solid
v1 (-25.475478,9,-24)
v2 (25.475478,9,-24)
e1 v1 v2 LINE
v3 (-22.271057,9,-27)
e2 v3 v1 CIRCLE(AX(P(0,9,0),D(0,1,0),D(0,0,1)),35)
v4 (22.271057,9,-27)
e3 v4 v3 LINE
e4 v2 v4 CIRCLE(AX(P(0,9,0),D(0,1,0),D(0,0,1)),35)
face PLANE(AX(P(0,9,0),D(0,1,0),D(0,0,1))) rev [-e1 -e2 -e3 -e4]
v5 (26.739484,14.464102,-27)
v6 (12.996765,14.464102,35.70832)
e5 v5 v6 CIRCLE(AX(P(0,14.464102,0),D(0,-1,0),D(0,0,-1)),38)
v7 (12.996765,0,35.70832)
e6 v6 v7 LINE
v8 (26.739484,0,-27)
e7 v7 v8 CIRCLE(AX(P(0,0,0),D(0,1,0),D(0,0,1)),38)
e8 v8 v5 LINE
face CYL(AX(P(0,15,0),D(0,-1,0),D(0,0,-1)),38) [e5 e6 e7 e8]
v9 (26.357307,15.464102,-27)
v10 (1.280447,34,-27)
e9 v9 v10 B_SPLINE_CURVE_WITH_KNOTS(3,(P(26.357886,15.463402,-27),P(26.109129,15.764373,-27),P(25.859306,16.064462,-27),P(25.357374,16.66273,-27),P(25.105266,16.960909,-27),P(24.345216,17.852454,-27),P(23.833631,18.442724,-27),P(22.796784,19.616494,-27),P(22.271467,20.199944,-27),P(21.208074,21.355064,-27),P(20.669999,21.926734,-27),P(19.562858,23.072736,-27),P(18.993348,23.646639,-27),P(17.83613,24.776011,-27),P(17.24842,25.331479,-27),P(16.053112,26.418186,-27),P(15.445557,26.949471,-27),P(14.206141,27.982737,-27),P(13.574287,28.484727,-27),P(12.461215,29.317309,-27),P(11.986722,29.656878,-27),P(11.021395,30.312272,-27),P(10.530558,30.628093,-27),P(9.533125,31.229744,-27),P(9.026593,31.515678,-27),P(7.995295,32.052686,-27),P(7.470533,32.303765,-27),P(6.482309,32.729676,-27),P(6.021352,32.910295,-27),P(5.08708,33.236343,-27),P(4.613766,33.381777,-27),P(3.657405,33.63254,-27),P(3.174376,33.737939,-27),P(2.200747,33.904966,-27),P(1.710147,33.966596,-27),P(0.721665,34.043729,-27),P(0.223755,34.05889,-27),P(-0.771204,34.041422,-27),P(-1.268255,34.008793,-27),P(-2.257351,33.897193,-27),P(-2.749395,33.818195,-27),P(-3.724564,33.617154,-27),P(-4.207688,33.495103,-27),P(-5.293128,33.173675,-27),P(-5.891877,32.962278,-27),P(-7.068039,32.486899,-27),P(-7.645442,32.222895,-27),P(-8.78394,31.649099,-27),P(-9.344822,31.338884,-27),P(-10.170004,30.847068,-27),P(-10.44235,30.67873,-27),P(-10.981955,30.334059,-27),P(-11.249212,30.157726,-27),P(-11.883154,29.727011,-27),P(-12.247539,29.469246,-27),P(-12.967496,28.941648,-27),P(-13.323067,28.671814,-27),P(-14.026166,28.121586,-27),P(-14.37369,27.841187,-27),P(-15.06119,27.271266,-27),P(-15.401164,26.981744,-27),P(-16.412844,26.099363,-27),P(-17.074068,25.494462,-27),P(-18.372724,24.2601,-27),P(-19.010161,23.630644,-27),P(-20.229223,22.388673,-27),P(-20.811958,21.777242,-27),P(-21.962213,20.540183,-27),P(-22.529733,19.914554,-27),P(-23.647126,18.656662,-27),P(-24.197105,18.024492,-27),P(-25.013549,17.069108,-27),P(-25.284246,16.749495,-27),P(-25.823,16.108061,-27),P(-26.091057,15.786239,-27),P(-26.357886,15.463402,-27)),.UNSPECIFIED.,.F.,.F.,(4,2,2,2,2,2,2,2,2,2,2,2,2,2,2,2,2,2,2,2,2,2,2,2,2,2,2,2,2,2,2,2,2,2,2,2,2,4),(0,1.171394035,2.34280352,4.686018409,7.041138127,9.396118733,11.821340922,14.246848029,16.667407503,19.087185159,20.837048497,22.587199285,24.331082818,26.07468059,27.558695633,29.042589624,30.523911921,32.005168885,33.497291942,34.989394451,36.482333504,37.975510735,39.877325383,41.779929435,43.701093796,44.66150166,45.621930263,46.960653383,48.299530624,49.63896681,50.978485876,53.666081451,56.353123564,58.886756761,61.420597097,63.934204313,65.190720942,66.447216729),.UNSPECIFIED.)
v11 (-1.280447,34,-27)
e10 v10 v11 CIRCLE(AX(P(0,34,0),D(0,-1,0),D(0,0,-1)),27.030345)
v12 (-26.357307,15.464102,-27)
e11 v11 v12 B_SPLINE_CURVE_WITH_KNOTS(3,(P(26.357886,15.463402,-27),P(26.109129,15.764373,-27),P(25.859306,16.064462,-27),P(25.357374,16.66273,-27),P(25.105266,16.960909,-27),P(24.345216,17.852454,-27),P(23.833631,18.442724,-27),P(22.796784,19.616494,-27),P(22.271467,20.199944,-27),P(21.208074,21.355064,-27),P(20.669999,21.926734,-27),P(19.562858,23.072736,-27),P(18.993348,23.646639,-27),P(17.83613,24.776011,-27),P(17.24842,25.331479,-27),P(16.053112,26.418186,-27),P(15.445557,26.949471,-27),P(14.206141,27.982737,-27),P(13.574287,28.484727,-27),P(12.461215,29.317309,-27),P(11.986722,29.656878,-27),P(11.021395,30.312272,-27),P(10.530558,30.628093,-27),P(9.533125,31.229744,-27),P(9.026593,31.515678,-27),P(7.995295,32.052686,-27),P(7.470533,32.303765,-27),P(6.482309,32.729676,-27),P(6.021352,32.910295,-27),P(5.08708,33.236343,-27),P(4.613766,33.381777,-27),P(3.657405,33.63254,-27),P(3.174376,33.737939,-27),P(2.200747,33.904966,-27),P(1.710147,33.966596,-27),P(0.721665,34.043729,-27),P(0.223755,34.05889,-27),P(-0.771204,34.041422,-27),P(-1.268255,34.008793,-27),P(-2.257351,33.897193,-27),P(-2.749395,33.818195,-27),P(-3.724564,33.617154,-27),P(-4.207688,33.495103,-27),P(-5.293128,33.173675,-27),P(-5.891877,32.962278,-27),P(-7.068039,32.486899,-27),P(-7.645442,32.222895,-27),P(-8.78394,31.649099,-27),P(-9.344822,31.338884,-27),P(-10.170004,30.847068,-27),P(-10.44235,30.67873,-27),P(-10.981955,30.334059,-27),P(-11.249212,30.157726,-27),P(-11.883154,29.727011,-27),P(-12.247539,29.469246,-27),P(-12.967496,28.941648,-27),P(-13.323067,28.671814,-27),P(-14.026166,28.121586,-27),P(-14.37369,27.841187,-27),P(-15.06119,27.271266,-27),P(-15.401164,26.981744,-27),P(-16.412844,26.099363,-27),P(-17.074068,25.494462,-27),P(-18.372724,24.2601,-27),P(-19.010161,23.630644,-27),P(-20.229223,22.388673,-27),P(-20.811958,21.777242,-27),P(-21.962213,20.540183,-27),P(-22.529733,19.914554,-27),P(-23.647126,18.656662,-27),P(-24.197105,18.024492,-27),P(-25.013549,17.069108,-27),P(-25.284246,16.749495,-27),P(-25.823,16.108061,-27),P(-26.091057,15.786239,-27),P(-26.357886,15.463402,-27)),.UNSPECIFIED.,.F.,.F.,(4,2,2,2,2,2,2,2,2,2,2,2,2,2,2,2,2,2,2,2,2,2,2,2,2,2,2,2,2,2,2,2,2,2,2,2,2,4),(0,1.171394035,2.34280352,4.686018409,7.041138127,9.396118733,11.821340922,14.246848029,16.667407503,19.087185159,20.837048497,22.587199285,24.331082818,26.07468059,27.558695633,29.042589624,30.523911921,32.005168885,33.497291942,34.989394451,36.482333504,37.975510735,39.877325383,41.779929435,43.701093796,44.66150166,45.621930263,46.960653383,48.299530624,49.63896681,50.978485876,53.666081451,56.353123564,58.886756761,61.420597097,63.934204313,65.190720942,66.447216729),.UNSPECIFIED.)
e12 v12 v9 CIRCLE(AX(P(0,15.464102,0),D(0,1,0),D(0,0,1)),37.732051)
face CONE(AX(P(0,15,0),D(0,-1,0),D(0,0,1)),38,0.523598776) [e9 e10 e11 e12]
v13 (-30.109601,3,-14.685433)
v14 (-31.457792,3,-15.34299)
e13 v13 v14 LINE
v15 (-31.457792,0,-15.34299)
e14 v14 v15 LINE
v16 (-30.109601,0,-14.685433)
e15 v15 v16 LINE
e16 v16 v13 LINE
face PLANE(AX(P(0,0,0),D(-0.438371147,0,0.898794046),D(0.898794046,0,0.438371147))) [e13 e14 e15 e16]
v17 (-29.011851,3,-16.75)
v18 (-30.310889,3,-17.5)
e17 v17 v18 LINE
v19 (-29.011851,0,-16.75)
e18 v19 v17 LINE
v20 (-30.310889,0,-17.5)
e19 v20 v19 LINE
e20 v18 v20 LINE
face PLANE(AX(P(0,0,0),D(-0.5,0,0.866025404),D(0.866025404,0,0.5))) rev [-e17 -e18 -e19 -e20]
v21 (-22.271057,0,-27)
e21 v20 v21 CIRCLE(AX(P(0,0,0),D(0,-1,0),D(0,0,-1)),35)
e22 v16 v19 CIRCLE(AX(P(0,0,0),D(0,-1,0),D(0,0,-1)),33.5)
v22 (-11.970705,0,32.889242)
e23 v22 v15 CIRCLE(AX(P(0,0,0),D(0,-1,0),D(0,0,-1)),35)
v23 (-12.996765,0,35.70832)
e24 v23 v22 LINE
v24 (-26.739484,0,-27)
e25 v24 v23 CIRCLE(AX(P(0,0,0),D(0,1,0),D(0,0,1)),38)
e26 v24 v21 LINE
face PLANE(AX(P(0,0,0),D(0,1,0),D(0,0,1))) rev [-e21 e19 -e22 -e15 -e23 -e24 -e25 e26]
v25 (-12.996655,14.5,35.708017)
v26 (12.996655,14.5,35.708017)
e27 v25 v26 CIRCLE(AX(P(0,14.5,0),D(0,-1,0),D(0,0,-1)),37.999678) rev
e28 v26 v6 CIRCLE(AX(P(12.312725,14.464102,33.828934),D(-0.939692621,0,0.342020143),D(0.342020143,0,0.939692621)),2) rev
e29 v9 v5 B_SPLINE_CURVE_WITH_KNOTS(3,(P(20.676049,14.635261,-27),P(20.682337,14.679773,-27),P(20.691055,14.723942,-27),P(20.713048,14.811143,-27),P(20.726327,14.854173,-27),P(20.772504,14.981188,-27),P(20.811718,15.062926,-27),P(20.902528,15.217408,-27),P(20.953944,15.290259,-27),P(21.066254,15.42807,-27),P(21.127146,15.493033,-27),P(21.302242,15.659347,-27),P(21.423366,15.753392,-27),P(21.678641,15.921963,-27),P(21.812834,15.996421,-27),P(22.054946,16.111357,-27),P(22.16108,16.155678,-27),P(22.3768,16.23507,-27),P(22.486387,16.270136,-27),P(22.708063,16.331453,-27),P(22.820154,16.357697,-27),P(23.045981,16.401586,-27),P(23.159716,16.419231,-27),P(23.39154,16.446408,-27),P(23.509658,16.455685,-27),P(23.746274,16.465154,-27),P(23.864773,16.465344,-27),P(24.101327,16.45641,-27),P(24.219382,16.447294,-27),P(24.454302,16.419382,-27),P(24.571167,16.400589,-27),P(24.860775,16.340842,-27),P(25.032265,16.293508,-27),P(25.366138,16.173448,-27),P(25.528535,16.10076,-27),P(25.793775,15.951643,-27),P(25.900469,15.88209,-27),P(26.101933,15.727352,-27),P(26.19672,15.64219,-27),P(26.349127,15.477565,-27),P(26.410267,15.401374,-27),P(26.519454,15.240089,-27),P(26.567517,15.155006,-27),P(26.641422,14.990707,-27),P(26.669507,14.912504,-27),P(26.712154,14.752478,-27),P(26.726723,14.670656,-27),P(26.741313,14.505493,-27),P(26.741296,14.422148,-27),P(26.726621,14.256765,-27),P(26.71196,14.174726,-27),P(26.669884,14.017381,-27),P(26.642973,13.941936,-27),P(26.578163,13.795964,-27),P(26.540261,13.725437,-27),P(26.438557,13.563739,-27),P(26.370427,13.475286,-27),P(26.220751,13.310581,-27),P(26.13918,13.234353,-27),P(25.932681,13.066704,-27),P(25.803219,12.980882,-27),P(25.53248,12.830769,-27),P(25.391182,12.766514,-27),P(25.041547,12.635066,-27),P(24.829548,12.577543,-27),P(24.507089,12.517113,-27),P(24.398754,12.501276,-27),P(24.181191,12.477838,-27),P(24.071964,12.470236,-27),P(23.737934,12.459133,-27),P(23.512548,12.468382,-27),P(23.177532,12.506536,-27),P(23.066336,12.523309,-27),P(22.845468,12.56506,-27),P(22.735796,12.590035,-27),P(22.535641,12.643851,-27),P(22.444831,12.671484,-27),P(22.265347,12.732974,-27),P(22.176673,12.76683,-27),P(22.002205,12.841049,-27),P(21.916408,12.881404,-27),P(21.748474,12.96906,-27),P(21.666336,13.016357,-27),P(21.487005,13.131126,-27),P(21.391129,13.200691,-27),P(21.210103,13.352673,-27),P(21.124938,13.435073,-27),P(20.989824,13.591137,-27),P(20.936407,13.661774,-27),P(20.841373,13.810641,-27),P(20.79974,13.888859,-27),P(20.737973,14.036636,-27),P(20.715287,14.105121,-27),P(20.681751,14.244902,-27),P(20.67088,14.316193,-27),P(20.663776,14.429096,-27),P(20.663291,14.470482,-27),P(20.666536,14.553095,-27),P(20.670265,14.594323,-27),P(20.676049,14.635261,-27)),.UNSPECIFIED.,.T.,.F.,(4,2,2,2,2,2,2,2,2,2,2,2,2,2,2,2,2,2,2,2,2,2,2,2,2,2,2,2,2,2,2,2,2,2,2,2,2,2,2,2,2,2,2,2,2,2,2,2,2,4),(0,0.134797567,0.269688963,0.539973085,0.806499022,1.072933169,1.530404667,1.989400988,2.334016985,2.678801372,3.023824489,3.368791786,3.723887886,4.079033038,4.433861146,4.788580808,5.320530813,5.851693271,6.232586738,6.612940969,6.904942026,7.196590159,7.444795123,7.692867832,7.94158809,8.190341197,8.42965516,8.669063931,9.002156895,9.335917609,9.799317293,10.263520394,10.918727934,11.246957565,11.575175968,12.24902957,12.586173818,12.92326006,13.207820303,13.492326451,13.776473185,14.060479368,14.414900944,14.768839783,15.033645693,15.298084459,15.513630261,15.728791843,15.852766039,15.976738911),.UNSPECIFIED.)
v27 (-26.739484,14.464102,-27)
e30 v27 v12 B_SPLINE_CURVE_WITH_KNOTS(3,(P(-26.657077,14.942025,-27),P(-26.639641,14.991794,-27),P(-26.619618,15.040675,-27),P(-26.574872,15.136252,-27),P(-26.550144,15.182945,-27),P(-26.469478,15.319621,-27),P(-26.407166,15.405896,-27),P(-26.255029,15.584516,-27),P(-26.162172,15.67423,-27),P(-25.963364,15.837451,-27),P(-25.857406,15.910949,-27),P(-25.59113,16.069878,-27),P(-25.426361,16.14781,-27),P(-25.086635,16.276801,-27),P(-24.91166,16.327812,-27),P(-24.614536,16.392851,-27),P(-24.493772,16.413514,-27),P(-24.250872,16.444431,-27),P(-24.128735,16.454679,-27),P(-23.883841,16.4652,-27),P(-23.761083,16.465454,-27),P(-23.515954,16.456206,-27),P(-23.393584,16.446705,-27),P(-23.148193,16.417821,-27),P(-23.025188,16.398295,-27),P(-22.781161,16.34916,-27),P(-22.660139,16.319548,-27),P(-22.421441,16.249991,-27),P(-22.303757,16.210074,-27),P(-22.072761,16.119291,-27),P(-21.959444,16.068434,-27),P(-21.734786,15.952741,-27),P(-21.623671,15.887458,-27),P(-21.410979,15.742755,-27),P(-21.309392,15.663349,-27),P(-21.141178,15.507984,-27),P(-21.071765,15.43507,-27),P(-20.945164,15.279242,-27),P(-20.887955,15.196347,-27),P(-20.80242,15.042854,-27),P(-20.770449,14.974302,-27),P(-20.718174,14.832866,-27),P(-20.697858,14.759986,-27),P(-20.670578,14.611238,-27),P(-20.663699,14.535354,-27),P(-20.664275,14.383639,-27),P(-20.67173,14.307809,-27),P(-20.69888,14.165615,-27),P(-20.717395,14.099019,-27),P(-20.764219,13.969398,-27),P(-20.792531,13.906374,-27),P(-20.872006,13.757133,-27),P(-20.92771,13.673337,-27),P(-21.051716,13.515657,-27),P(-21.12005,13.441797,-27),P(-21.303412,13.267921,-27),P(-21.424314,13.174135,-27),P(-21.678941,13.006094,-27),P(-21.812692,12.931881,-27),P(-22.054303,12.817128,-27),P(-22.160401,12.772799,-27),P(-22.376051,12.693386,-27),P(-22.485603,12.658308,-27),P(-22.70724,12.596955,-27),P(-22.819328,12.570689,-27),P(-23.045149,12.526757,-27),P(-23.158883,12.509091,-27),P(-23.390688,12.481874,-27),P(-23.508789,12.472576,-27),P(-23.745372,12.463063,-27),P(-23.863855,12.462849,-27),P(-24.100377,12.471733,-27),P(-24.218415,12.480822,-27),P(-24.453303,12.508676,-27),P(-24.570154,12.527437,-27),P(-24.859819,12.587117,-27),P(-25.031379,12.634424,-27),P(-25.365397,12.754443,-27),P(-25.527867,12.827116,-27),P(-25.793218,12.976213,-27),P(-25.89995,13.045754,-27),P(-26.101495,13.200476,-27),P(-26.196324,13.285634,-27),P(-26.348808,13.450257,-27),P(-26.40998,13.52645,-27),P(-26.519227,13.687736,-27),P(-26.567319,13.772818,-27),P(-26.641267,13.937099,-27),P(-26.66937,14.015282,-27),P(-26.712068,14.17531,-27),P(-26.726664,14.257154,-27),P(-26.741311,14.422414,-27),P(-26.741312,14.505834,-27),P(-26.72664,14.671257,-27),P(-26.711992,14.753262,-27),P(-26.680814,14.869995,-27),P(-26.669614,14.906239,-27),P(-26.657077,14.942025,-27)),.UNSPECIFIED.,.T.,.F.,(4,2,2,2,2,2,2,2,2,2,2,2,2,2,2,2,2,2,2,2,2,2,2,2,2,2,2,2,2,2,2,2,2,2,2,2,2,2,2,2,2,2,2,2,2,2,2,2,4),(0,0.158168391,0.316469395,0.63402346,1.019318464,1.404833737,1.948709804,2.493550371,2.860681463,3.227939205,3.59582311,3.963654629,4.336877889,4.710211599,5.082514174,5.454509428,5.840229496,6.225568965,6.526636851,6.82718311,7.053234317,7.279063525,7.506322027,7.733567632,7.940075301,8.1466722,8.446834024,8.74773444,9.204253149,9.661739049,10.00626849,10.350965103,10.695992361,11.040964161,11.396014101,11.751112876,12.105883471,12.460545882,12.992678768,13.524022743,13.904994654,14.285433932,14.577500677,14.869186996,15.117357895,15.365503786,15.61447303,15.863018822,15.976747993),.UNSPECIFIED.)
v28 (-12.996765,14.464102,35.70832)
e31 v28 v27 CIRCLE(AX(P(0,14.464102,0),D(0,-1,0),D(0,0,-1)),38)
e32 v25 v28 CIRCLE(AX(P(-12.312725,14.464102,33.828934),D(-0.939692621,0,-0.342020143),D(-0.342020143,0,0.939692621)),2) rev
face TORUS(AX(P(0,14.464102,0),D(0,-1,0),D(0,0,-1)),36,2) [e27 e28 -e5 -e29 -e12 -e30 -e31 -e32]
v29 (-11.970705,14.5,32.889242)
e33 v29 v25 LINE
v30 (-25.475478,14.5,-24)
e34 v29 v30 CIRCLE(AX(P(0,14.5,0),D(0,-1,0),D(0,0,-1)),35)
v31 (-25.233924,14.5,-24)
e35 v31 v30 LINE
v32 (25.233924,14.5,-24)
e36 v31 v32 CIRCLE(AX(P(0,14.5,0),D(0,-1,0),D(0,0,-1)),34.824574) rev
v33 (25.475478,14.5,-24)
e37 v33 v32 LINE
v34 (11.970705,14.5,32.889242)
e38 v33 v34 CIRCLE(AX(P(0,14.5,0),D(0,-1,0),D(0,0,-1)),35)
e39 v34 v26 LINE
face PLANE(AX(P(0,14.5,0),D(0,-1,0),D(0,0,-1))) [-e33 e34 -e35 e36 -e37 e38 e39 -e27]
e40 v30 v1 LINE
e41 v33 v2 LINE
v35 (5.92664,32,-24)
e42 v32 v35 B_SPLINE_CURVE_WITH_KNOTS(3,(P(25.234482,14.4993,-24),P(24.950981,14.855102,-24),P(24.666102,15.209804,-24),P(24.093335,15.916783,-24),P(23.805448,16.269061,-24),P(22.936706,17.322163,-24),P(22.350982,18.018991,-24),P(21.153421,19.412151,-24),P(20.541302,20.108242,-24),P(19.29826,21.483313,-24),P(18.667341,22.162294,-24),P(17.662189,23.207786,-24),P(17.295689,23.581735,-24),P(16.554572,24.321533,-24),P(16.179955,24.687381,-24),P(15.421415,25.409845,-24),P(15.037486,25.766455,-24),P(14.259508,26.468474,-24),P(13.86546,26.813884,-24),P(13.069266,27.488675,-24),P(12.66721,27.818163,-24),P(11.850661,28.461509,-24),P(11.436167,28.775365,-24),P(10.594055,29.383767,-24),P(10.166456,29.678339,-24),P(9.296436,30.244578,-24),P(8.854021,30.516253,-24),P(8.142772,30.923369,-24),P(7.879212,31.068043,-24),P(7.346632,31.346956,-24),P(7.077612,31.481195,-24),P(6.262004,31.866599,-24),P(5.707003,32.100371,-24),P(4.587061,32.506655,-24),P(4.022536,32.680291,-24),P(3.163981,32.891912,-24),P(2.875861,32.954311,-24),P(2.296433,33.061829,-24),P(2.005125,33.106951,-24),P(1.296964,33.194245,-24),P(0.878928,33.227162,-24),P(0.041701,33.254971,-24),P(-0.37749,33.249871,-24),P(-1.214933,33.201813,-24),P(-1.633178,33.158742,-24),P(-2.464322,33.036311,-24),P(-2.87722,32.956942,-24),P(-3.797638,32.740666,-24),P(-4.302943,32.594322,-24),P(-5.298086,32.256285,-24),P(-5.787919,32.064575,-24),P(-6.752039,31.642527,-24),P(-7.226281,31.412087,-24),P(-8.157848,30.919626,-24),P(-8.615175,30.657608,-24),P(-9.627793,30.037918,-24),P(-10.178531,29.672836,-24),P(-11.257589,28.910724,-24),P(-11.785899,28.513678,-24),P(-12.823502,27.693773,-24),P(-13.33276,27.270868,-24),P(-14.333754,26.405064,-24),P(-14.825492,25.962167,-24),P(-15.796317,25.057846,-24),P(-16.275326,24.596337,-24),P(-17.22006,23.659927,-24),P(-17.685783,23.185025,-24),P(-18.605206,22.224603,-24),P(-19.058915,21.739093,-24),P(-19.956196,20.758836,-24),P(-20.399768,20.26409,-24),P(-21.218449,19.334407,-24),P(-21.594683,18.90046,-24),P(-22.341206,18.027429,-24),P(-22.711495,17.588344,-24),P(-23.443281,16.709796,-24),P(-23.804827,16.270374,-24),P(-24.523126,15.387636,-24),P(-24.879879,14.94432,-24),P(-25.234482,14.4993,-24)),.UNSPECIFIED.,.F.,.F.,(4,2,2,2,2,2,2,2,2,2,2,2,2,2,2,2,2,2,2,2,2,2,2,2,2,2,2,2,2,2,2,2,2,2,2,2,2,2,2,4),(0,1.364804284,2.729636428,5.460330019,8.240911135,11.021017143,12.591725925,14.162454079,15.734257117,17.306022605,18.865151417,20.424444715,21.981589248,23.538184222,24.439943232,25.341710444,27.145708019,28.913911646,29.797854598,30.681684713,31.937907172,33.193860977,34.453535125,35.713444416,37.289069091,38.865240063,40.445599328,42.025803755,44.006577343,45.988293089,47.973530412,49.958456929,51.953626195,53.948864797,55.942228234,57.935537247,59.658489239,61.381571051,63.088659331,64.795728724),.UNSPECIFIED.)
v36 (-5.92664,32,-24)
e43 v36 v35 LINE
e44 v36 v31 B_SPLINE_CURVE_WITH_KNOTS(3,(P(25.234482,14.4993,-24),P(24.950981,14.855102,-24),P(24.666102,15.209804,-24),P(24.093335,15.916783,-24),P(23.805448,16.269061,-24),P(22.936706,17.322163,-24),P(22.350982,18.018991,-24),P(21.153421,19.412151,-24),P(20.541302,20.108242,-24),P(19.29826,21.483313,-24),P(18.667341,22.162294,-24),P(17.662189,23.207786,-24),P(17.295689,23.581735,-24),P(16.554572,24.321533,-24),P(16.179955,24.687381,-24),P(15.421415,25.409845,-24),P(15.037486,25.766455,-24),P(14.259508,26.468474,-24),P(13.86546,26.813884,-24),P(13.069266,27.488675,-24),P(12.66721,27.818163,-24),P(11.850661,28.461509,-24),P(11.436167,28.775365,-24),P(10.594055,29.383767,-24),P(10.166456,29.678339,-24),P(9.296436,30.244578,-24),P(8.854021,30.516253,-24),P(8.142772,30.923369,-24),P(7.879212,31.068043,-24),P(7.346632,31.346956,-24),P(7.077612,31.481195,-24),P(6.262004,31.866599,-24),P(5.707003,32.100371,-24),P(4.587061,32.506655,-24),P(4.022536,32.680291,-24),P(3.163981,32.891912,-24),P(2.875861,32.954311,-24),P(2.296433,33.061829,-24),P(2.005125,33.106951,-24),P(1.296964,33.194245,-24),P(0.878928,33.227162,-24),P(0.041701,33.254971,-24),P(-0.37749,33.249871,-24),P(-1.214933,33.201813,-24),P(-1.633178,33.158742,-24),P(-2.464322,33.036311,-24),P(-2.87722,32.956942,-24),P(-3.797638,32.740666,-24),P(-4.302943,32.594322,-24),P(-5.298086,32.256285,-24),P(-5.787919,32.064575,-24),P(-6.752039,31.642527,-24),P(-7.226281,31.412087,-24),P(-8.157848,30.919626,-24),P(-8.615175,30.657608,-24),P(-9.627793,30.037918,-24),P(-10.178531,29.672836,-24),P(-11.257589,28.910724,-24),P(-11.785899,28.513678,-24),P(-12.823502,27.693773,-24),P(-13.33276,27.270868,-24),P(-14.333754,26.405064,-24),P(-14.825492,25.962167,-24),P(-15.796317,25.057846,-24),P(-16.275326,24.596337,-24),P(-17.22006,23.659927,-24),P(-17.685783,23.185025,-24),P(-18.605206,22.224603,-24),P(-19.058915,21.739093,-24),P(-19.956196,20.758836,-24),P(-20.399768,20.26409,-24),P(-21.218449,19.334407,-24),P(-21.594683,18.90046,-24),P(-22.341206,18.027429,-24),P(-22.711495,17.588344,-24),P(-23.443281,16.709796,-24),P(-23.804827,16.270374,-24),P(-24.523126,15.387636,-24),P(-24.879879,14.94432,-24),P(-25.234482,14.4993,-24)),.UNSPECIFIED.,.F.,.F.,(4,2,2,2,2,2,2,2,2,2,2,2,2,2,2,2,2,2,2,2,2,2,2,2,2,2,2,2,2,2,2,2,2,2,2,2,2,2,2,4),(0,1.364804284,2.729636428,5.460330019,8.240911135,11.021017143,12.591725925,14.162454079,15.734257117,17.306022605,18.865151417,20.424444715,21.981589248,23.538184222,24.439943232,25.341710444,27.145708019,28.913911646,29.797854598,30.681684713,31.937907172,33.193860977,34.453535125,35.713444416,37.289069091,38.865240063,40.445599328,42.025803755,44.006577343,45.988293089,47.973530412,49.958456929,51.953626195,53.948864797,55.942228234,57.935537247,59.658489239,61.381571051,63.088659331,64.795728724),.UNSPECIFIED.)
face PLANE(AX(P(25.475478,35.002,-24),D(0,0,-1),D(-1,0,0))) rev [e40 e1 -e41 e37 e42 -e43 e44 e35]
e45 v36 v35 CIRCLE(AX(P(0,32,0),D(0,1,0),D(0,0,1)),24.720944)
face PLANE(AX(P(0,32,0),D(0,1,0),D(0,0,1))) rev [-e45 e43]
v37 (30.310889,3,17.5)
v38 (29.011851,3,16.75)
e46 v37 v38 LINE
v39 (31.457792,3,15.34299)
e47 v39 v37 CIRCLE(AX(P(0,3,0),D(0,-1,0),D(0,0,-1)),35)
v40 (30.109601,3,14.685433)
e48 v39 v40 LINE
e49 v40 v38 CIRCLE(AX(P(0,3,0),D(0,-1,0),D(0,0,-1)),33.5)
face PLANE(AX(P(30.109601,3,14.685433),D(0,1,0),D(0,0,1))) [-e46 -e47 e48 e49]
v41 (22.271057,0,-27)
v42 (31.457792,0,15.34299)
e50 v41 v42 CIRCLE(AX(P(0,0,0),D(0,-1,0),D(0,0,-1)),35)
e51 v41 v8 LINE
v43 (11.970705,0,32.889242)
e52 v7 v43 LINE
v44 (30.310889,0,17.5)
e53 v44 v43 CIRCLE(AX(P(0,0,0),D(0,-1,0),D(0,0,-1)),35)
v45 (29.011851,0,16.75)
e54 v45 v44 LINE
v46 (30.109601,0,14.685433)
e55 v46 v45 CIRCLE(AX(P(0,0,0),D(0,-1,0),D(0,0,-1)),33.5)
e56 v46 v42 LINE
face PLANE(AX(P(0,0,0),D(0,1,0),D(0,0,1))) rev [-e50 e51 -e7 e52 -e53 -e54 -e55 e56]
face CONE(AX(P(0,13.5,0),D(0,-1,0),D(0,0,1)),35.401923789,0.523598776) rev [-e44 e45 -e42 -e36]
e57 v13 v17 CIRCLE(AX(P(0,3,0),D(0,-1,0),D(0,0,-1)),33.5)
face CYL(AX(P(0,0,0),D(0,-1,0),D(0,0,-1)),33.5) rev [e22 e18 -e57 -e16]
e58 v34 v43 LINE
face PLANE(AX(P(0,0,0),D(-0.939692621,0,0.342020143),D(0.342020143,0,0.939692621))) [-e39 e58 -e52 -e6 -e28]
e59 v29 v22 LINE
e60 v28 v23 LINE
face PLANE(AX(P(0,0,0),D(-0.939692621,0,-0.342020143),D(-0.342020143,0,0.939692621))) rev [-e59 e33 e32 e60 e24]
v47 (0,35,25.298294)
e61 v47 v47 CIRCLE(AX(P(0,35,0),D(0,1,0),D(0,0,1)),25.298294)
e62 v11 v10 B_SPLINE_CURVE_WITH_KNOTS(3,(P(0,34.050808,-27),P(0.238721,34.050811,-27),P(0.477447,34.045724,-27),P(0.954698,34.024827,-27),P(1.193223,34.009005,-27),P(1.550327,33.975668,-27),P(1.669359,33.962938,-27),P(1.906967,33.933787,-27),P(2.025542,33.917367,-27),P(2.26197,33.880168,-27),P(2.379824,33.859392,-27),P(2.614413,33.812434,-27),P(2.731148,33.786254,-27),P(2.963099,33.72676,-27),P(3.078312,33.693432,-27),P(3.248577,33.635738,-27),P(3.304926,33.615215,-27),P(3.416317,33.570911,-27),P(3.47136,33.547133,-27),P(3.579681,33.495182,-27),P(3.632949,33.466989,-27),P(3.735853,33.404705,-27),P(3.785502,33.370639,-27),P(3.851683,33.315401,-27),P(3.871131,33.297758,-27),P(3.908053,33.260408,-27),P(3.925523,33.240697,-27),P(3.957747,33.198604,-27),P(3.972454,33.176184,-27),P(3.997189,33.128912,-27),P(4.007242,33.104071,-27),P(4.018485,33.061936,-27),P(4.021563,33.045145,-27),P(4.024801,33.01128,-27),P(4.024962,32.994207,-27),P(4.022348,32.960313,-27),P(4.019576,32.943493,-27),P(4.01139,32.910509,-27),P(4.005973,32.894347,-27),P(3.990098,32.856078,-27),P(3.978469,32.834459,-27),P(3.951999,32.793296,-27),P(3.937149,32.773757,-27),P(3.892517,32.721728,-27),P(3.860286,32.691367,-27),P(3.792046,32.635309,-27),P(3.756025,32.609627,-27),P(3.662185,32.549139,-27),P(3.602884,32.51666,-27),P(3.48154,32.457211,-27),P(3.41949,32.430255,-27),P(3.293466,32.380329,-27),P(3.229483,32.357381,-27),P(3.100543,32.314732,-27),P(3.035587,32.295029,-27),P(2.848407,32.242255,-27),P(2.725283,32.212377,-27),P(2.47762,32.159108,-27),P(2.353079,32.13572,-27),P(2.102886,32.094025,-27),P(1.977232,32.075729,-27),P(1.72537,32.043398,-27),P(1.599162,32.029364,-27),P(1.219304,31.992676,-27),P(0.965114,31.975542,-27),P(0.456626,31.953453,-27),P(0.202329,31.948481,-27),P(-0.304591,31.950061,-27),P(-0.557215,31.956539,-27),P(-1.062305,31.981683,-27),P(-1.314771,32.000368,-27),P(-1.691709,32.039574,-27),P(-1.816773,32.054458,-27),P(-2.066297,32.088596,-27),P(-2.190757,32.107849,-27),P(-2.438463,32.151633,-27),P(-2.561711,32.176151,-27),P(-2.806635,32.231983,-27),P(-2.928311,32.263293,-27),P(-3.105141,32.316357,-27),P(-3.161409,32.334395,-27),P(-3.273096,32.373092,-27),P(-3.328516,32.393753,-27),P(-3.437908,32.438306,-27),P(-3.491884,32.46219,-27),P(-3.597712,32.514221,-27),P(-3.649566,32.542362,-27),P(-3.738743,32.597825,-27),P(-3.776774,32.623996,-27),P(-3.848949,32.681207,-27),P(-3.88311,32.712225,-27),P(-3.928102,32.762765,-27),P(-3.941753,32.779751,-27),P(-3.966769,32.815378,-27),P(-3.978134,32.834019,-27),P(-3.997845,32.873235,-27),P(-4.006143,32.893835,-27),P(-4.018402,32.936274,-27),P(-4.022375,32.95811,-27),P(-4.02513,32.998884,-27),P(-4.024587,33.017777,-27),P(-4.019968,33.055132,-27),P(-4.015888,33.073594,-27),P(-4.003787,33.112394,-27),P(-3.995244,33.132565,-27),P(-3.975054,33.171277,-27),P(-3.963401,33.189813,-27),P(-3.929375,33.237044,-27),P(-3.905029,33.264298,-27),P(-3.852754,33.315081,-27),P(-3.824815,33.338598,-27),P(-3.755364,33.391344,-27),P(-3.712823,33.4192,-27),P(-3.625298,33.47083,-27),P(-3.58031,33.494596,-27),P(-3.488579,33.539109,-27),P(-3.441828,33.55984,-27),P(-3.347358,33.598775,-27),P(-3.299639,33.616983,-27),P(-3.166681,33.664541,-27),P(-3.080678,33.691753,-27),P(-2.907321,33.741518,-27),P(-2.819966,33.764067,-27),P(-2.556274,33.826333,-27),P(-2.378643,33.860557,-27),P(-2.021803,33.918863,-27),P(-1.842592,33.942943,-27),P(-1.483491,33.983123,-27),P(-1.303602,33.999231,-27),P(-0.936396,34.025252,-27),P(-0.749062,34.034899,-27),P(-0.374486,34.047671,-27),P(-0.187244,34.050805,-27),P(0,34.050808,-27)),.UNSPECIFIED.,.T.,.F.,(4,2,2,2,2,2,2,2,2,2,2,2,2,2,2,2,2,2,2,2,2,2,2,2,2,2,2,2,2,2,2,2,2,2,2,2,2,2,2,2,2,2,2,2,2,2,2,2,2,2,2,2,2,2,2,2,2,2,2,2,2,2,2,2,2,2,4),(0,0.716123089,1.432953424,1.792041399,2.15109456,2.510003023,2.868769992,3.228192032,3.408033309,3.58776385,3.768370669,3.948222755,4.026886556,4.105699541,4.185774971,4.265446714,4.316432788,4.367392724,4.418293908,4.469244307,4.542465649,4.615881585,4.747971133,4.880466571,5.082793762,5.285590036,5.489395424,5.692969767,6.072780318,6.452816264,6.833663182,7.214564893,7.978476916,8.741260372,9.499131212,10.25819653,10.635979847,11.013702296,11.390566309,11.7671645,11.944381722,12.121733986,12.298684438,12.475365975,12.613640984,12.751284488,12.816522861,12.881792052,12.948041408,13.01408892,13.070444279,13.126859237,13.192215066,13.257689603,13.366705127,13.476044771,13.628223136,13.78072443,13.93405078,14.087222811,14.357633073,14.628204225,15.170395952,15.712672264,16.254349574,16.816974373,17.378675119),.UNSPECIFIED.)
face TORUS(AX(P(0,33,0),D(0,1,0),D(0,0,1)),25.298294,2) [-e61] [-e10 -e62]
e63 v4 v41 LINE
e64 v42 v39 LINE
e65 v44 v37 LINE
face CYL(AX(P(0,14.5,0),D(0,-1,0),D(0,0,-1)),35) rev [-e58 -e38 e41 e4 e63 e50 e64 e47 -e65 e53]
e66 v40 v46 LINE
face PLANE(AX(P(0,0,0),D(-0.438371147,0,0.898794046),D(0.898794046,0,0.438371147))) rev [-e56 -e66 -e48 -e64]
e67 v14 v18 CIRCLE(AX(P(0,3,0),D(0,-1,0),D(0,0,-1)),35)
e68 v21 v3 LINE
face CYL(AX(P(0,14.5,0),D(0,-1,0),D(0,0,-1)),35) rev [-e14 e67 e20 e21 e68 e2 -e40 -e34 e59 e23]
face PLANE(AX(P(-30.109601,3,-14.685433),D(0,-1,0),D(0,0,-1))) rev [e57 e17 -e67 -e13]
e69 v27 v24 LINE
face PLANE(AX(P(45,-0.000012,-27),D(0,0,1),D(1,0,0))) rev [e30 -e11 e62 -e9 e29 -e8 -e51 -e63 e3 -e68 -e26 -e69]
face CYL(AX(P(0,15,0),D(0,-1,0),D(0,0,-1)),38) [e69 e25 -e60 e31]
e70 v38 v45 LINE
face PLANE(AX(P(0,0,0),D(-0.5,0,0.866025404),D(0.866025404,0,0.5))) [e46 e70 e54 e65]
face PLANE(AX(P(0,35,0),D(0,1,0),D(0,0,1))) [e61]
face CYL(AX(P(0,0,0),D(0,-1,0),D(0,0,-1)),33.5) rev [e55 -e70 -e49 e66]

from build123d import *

# Parameters (mm, degrees)
ESQUISSE1_R                                   = 38
BOSS_EXTRU_1_DEPTH                            = 15
ESQUISSE4_R                                   = 35
ENL_V_MAT_EXTRU_1_DEPTH                       = 14.5
ESQUISSE9_R                                   = 38
BOSS_EXTRU_2_DEPTH                            = 20
BOSS_EXTRU_2_TAPER                            = 30
CONG_1_R                                      = 2
ESQUISSE7_W                                   = 6
ESQUISSE7_H                                   = 14.5
ENL_VEMENT_DE_MATI_RE_R_VOLUTION1_ANGLE       = 20
ENL_VEMENT_DE_MATI_RE_R_VOLUTION1_OTHER_ANGLE = 20
ENL_V_MAT_EXTRU_3_DEPTH                       = 65.132675714
ENL_V_MAT_EXTRU_3_DEPTH_BACK                  = 65.132675714
ESQUISSE10_W                                  = 90
ESQUISSE10_H                                  = 30
BOSS_EXTRU_3_REACH                            = 66.132
ESQUISSE14_W                                  = 3
ESQUISSE14_H                                  = 1.5
R_VOLUTION1_ANGLE                             = 4
ENL_V_MAT_EXTRU_4_DEPTH                       = 9


# Read off the part's stored shape, not the designer's step: Coque1
with BuildPart() as part:
    # Esquisse1 → Boss.-Extru.1 (new body)
    with BuildSketch(Plane(origin=(0, 0, 0), x_dir=(1, 0, 0), z_dir=(0, 1, 0))):
        with Locations(Location((0, 0, 0), (0, 0, 270))):
            Circle(ESQUISSE1_R)
    extrude(amount=BOSS_EXTRU_1_DEPTH)

    # Esquisse4 → Enlèv. mat.-Extru.1 (cut)
    with BuildSketch(Plane.XZ):
        with Locations(Location((0, 0, 0), (0, 0, 270))):
            Circle(ESQUISSE4_R)
    extrude(amount=-ENL_V_MAT_EXTRU_1_DEPTH, mode=Mode.SUBTRACT)

    # Esquisse9 → Boss.-Extru.2 (add)
    with BuildSketch(Plane(origin=(0, 15, 0), x_dir=(1, 0, 0), z_dir=(0, 1, 0))):
        with Locations(Location((0, 0, 0), (0, 0, 270))):
            Circle(ESQUISSE9_R)
    extrude(amount=BOSS_EXTRU_2_DEPTH, taper=BOSS_EXTRU_2_TAPER)

    # Congé1
    cong_1_edges = [part.edges().sort_by_distance(p)[0] for p in [
        (0, 35, -26.452994616),
        (0, 15, -38),
    ]]
    fillet(cong_1_edges, radius=CONG_1_R)

    # Esquisse7 → Enlèvement de matière-Révolution1 (revolve, cut)
    with BuildSketch(Plane(origin=(0, 0, 0), x_dir=(0, 0, -1), z_dir=(1, 0, 0))):
        with Locations((-35, 7.25)):
            Rectangle(ESQUISSE7_W, ESQUISSE7_H)
    revolve(axis=Axis((0, 0, 0), (0, 1, 0)), revolution_arc=ENL_VEMENT_DE_MATI_RE_R_VOLUTION1_ANGLE, mode=Mode.SUBTRACT)

    # Esquisse7 → Enlèvement de matière-Révolution1 other (revolve, cut)
    with BuildSketch(Plane(origin=(0, 0, 0), x_dir=(0, 0, -1), z_dir=(1, 0, 0))):
        with Locations((-35, 7.25)):
            Rectangle(ESQUISSE7_W, ESQUISSE7_H)
    revolve(axis=Axis((0, 0, 0), (0, -1, 0)), revolution_arc=ENL_VEMENT_DE_MATI_RE_R_VOLUTION1_OTHER_ANGLE, mode=Mode.SUBTRACT)

    # Coque1 outline → Coque1 (revolve, cut)
    with BuildSketch(Plane.XY):
        Polygon((34.824573519, 14.5), (24.720943809, 32), (0, 32), (0, 14.5), align=None)
    revolve(axis=Axis((0, 0, 0), (0, 1, 0)), mode=Mode.SUBTRACT)

    # Esquisse10 → Enlèv. mat.-Extru.3 (cut, two sides: drawn at the far end of the back side and taken through both)
    with BuildSketch(Plane(origin=(0, 0, 0), x_dir=(1, 0, 0), z_dir=(0, 1, 0)).offset(-ENL_V_MAT_EXTRU_3_DEPTH_BACK)):
        with Locations((0, 42)):
            Rectangle(ESQUISSE10_W, ESQUISSE10_H)
    extrude(amount=ENL_V_MAT_EXTRU_3_DEPTH + ENL_V_MAT_EXTRU_3_DEPTH_BACK, mode=Mode.SUBTRACT)

    # Esquisse13 → Boss.-Extru.3 (add, up to next)
    with BuildSketch(Plane(origin=(0, 0, 0), x_dir=(1, 0, 0), z_dir=(0, 1, 0)), mode=Mode.PRIVATE) as boss_extru_3_sk1:
        with BuildLine():
            Line((22.271057451, 27), (-22.271057451, 27))
            ThreePointArc((-22.271057451, 27), (-23.920345348, 25.55028529), (-25.475478406, 24))
            Line((-25.475478406, 24), (25.475478406, 24))
            ThreePointArc((25.475478406, 24), (23.920345348, 25.55028529), (22.271057451, 27))
        make_face()
    boss_extru_3_tool1 = extrude(boss_extru_3_sk1.sketch, amount=BOSS_EXTRU_3_REACH, mode=Mode.PRIVATE) - part.part
    add(boss_extru_3_tool1.solids().sort_by_distance((0, 0, -25.466594))[0])

    # Esquisse14 → Révolution1 (revolve)
    with BuildSketch(Plane(origin=(0, 0, 0), x_dir=(0, -1, 0), z_dir=(-0.500000000000001, 0, 0.866025403784438))):
        with Locations((-1.5, 34.25)):
            Rectangle(ESQUISSE14_W, ESQUISSE14_H)
        with Locations((-1.5, -34.25)):
            Rectangle(ESQUISSE14_W, ESQUISSE14_H)
    revolve(axis=Axis((0, 0, 0), (0, 1, 0)), revolution_arc=R_VOLUTION1_ANGLE)

    # Esquisse15 → Enlèv. mat.-Extru.4 (cut)
    with BuildSketch(Plane(origin=(0, 0, 0), x_dir=(1, 0, 0), z_dir=(0, 1, 0))):
        with BuildLine():
            Line((28.722813233, 20), (-28.722813233, 20))
            ThreePointArc((-28.722813233, 20), (0, 35), (28.722813233, 20))
        make_face()
    extrude(amount=ENL_V_MAT_EXTRU_4_DEPTH, mode=Mode.SUBTRACT)


solid = part.part
